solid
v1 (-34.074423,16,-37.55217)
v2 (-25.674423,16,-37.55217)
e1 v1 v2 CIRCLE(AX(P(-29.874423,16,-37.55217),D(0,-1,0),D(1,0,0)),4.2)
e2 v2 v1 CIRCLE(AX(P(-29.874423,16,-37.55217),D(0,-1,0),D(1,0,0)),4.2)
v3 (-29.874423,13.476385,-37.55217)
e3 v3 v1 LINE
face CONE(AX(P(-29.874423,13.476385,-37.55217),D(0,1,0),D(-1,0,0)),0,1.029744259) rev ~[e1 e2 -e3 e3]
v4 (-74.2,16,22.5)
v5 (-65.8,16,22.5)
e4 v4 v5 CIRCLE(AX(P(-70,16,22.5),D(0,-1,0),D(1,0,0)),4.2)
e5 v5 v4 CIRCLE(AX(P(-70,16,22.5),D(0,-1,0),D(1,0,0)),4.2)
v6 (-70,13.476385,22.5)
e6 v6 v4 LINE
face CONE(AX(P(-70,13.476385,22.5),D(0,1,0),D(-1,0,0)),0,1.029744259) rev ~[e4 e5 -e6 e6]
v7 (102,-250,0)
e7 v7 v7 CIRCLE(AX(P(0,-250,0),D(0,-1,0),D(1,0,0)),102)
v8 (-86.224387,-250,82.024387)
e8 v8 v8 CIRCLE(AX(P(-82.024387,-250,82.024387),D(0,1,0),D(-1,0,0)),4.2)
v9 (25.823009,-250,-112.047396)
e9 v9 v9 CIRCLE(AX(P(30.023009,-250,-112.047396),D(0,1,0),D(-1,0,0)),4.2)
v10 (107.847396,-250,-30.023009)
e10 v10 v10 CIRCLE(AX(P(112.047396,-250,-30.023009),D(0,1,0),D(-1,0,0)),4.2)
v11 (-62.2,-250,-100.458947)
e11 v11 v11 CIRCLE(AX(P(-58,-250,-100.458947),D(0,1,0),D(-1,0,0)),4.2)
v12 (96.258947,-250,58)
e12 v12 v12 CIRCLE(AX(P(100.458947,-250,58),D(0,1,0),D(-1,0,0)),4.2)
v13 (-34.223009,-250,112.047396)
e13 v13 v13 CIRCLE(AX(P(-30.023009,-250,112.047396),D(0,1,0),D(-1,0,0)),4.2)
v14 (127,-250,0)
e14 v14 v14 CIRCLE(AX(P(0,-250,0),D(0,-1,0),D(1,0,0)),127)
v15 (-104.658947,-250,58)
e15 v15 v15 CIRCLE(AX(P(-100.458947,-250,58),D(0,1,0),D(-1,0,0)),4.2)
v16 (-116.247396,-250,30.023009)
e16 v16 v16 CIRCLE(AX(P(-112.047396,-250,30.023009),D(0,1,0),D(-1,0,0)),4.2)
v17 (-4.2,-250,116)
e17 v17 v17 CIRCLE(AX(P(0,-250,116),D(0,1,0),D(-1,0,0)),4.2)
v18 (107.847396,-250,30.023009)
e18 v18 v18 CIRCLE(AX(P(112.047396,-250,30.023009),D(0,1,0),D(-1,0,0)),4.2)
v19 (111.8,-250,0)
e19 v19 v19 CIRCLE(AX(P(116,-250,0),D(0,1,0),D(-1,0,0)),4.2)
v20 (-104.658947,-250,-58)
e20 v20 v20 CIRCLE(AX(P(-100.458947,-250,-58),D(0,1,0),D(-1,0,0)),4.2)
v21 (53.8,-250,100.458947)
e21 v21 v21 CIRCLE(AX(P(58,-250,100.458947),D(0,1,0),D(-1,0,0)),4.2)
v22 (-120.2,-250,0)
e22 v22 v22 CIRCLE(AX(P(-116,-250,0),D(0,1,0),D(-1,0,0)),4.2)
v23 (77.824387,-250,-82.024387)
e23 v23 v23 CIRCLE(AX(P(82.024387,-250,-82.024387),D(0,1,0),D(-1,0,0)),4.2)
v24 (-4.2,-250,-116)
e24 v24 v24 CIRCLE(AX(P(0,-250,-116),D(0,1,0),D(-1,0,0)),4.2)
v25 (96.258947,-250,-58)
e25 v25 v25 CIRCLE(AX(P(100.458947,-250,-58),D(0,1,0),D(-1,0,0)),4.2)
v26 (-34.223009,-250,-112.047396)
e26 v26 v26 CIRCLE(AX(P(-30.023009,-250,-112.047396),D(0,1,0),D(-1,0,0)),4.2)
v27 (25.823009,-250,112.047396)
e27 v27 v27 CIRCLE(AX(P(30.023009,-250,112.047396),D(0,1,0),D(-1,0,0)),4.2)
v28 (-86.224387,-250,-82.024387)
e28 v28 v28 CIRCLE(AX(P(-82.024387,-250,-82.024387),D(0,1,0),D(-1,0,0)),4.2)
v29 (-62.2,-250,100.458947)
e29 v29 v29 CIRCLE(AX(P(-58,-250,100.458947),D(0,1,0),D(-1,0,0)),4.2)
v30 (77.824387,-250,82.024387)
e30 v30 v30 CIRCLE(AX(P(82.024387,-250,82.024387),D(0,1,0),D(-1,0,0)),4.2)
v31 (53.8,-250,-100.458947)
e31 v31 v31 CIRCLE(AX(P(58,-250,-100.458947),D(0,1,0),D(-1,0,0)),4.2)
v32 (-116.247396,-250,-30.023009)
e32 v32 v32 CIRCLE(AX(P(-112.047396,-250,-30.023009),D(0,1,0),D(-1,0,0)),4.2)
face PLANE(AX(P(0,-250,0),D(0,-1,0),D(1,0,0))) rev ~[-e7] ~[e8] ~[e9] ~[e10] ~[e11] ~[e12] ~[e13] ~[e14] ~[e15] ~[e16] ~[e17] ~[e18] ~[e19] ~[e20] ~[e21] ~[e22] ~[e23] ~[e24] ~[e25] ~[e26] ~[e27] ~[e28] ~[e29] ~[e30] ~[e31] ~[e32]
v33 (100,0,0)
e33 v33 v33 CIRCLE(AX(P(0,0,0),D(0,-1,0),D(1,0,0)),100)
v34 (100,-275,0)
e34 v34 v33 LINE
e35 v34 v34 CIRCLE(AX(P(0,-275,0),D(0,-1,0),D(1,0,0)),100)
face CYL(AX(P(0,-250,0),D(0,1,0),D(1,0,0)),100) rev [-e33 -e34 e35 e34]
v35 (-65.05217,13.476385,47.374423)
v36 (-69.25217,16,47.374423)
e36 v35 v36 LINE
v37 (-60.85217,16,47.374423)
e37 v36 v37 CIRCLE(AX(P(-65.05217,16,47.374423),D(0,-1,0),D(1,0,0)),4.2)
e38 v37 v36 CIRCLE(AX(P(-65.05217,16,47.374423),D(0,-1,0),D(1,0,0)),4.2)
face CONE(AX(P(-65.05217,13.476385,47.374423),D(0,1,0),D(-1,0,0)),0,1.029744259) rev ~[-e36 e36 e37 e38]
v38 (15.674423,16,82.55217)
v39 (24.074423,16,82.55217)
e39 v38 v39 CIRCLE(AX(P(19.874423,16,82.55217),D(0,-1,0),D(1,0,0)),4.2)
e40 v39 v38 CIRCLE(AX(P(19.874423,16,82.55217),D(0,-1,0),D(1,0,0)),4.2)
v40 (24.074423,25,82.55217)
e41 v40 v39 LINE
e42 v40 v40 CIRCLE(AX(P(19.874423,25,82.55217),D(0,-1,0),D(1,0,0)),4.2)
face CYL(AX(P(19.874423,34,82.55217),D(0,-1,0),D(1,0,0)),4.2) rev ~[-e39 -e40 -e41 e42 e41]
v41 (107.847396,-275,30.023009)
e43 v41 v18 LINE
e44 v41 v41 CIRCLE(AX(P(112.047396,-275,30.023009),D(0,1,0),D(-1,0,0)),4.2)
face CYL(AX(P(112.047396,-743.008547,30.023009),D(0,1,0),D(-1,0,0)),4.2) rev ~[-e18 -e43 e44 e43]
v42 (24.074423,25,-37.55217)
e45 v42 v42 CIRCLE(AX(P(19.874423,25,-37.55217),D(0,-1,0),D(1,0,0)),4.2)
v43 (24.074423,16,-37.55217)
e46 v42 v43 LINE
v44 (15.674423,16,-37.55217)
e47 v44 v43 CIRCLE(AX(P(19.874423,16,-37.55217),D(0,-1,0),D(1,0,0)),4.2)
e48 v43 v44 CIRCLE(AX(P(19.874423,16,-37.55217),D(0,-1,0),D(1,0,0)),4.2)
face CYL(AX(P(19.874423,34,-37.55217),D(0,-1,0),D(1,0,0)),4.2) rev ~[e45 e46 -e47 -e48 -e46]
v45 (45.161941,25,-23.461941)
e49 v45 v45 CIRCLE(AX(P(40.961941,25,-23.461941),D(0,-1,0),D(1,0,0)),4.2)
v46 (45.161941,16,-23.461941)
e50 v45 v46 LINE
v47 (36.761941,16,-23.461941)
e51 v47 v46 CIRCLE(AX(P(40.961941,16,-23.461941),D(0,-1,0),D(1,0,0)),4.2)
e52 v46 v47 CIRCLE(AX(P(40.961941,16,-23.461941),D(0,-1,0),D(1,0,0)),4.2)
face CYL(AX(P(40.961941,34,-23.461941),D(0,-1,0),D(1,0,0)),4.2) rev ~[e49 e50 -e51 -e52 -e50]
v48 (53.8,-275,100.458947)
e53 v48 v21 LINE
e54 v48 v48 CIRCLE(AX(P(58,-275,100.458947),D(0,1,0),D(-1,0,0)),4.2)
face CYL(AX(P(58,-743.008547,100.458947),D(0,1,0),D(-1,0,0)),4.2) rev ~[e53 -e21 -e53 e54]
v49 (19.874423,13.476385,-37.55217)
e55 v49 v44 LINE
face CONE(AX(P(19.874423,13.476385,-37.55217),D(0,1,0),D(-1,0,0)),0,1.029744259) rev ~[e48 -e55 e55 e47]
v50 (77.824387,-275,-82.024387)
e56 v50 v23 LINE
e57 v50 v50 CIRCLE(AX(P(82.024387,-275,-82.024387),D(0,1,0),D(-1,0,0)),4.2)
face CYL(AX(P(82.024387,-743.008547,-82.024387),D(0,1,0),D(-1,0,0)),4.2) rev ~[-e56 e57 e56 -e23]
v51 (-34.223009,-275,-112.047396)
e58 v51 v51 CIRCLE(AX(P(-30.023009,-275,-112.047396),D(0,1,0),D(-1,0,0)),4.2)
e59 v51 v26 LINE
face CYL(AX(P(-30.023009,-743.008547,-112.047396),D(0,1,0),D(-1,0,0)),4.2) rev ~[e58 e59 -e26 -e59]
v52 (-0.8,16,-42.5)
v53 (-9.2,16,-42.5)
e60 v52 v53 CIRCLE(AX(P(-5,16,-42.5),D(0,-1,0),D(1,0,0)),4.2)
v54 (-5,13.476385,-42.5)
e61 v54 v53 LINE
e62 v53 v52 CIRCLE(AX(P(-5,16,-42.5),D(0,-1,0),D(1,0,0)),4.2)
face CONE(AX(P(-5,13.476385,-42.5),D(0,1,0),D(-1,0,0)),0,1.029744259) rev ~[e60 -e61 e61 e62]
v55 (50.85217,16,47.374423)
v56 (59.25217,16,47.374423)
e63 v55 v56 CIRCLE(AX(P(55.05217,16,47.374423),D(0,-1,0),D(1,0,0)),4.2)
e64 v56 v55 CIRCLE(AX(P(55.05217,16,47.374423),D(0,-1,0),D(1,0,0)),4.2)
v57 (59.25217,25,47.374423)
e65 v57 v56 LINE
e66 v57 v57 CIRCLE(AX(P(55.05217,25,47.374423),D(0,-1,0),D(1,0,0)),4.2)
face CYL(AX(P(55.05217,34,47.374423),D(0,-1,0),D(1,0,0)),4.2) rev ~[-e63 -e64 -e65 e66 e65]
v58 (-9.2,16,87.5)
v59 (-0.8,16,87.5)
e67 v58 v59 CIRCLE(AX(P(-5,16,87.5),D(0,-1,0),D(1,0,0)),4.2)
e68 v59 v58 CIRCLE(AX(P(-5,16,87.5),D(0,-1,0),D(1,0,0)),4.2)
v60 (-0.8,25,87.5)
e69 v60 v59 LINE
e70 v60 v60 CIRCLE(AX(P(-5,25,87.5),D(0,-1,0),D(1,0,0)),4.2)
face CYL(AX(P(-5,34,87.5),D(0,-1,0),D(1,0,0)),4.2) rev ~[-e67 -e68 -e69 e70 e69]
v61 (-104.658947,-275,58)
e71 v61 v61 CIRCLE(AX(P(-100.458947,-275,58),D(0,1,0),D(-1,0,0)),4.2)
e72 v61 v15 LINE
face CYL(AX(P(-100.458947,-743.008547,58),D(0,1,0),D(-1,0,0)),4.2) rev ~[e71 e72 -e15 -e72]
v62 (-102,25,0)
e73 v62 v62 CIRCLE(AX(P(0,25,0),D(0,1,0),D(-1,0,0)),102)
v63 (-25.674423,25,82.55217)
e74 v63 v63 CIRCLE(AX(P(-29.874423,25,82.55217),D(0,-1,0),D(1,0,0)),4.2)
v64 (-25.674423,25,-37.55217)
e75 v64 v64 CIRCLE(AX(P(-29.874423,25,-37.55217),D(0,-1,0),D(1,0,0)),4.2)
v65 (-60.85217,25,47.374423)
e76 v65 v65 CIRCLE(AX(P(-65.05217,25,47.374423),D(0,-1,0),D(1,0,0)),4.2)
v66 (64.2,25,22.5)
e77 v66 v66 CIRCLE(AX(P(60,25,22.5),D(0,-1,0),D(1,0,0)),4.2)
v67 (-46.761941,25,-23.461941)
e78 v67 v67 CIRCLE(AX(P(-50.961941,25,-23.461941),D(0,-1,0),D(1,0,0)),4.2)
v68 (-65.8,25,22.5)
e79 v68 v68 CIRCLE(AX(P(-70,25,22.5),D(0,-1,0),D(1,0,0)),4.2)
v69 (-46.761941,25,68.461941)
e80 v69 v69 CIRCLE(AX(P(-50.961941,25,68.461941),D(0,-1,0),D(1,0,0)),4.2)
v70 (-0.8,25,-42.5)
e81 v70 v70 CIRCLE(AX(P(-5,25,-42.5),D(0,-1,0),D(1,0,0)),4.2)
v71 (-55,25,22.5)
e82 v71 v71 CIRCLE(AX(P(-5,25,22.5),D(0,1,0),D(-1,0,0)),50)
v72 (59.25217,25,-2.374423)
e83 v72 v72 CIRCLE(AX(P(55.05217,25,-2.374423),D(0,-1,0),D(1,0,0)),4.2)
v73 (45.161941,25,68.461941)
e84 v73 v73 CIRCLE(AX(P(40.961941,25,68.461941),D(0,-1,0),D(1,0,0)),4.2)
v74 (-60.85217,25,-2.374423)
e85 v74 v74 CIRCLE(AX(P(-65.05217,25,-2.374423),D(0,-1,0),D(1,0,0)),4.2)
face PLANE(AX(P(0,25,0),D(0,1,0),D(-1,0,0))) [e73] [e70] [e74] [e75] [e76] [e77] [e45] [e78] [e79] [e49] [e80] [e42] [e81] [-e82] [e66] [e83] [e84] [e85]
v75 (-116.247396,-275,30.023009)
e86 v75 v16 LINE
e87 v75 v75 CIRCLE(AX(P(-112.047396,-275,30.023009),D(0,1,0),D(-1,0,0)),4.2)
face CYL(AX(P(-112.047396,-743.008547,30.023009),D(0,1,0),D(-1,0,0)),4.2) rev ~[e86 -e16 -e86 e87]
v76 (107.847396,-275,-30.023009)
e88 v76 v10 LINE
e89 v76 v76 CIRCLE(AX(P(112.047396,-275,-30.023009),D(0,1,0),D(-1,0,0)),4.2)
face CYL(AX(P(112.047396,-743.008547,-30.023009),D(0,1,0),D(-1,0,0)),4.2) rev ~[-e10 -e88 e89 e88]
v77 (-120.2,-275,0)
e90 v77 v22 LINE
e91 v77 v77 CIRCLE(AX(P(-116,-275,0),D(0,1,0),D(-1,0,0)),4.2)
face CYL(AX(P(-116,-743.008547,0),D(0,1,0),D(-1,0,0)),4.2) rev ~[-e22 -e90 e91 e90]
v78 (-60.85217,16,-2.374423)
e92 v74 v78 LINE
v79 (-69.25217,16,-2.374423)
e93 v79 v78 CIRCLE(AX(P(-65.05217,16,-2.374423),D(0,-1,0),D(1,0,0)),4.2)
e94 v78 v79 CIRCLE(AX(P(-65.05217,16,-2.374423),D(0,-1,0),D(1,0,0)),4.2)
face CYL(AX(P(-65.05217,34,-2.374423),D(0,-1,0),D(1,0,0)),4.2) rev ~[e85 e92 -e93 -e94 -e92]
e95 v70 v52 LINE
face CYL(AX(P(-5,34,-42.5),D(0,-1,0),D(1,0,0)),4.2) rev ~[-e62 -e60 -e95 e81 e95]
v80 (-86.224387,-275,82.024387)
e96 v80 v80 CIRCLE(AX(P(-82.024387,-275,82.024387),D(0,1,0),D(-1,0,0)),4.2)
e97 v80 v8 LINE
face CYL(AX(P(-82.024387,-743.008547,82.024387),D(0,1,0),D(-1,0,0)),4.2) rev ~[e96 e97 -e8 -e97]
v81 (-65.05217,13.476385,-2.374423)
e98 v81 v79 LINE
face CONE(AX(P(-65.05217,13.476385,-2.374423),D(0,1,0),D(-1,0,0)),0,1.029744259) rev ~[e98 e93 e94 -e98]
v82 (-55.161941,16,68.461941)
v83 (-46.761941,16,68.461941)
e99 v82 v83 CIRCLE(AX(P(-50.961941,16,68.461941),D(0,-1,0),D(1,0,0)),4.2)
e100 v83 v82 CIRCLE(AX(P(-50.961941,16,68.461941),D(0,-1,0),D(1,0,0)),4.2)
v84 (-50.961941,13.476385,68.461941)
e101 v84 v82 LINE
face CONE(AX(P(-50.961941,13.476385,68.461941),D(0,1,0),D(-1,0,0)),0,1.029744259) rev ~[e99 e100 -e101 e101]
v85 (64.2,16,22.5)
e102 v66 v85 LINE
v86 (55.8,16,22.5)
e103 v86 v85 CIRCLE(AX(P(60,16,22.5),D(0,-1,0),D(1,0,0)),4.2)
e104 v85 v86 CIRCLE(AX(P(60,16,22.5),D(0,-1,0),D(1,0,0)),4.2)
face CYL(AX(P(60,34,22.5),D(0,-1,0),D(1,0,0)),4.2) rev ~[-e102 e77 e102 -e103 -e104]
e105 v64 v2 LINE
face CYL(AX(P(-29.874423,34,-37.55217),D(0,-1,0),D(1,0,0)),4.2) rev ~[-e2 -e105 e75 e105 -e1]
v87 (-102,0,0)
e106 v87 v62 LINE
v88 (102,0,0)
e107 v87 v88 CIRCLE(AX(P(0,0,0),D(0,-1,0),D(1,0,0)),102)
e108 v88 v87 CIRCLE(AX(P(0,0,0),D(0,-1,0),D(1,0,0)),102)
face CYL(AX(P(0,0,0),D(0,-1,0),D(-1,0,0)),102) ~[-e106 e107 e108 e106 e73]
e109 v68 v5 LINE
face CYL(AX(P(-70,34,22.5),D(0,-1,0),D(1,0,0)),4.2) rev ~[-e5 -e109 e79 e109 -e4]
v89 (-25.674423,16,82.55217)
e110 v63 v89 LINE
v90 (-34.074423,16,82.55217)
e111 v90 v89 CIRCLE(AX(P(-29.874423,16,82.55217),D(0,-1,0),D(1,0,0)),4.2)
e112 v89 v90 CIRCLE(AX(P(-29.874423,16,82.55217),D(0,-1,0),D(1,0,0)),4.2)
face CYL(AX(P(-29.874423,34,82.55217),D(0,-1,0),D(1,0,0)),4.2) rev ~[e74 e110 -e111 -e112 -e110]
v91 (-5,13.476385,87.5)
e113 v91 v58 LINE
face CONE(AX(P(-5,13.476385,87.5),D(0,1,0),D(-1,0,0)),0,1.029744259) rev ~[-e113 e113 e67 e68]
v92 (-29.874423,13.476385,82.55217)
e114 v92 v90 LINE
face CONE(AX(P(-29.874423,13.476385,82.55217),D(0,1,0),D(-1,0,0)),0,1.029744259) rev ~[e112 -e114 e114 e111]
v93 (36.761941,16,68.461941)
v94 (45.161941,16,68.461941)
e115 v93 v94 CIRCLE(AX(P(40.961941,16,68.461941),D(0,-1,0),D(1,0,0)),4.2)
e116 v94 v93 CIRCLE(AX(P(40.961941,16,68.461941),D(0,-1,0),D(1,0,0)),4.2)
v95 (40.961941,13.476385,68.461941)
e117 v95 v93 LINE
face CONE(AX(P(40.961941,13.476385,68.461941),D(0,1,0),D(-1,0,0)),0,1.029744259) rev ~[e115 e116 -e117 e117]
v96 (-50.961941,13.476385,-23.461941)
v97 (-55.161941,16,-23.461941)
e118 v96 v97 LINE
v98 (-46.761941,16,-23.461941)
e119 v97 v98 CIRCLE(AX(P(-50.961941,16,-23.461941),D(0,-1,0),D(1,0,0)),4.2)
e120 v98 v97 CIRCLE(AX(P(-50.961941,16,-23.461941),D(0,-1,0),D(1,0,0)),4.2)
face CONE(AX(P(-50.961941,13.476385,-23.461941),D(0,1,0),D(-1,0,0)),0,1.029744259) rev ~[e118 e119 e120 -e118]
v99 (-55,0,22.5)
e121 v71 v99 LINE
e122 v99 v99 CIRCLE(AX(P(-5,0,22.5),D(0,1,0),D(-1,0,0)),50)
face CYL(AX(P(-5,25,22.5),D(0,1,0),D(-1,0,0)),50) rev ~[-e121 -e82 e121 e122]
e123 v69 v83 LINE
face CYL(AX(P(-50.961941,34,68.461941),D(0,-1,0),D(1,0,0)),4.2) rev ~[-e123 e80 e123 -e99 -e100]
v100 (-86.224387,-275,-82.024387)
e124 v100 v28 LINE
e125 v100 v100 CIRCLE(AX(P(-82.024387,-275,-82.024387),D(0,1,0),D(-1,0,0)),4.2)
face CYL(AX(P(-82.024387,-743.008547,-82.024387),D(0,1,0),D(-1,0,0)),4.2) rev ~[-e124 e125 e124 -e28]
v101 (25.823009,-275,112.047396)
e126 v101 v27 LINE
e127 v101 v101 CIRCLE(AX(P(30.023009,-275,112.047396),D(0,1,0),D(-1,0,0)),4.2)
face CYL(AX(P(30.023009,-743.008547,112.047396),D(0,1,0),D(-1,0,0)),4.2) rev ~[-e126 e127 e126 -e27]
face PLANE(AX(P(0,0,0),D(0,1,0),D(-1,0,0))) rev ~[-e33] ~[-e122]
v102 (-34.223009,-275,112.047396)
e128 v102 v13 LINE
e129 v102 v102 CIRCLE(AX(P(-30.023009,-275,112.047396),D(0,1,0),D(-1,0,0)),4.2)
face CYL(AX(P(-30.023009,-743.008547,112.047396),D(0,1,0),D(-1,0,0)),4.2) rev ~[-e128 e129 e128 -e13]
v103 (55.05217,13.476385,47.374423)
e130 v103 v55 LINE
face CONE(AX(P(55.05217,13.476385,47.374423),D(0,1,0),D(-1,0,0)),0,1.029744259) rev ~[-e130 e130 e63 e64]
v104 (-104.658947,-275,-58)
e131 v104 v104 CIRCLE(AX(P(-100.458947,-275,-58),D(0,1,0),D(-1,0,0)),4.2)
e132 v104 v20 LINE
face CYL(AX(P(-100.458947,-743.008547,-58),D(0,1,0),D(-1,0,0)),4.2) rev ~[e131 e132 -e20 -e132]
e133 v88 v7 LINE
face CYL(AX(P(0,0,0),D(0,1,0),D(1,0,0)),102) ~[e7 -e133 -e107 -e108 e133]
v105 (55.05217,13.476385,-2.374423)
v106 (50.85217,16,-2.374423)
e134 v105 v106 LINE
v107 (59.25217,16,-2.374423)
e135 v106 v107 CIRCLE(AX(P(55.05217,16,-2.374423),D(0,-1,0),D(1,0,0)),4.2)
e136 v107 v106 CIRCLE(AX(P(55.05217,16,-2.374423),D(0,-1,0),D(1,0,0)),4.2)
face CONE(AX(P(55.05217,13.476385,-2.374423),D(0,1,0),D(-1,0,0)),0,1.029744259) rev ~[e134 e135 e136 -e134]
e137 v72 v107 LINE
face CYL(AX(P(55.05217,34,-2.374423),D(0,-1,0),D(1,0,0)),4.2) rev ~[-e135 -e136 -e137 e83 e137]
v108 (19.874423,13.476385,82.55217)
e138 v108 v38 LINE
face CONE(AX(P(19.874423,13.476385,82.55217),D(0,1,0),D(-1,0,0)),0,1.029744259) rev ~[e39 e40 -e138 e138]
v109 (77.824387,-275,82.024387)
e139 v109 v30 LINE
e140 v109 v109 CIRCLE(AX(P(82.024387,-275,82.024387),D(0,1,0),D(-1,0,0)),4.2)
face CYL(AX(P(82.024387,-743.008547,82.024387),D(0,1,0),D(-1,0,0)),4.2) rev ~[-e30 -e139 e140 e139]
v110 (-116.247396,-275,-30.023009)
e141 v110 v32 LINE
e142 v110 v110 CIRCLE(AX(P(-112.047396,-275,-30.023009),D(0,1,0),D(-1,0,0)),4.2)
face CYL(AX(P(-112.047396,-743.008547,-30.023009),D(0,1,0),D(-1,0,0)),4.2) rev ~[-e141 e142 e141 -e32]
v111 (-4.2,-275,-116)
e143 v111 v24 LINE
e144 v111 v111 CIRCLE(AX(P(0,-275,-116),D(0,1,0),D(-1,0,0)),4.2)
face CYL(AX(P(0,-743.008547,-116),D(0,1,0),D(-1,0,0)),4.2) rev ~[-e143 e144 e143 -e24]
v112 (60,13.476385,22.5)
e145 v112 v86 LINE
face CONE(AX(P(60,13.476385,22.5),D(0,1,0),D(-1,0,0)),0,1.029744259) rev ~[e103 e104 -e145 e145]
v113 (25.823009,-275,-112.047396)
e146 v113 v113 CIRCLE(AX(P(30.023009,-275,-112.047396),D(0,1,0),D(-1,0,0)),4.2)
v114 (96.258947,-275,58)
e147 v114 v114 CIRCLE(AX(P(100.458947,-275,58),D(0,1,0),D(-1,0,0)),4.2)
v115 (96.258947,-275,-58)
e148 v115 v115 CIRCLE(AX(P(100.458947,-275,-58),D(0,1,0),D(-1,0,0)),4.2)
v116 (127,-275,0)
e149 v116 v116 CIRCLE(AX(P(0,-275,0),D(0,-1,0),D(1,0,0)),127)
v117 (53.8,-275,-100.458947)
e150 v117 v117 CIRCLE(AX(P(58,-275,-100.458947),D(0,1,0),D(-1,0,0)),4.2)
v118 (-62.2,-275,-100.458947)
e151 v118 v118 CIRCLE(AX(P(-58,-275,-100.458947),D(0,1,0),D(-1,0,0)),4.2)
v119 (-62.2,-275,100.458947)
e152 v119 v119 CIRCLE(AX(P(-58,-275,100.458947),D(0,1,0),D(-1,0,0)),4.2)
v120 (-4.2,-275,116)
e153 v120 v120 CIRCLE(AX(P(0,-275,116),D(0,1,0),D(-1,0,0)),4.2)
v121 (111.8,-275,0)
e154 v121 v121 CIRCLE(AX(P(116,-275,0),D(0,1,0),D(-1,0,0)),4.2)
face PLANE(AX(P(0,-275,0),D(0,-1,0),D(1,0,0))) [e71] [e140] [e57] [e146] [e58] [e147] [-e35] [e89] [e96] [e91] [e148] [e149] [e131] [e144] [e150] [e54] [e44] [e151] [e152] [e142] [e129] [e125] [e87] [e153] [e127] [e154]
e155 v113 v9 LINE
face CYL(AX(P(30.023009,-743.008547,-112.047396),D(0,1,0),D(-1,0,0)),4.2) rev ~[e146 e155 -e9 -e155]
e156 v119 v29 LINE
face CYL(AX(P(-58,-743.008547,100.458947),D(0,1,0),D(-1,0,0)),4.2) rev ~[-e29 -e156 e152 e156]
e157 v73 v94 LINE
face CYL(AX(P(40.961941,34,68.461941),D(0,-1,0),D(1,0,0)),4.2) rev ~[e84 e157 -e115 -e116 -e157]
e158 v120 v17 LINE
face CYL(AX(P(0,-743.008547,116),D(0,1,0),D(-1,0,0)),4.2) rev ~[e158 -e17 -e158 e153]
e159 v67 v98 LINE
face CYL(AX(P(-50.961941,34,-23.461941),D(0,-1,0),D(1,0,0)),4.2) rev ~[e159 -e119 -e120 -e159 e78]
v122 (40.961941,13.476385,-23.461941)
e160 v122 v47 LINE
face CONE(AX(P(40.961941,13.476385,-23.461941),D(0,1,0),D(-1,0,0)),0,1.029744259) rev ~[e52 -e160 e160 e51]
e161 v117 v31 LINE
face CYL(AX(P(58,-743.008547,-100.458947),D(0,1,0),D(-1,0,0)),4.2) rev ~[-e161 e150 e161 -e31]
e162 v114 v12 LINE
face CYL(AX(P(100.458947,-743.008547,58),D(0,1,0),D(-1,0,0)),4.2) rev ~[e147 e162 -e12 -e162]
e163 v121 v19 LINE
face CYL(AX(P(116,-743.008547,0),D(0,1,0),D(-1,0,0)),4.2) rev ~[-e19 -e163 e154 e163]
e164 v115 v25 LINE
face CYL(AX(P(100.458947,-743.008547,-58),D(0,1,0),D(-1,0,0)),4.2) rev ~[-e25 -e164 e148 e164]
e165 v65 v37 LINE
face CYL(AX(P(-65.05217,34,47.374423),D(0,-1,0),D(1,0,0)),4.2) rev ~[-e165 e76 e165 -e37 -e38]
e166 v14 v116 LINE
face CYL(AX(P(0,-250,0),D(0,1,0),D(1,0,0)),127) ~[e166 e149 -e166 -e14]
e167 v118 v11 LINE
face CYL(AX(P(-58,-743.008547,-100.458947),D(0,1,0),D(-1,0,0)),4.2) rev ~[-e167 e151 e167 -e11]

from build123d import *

# Parameters (mm, degrees)
F0_R      = 102
F0_R_2    = 100
F1_DEPTH  = 250
F2_R      = 127
F2_R_2    = 102
F2_R_3    = 100
F3_DEPTH  = 25
F4_R      = 102
F4_R_2    = 100
F5_DEPTH  = 25
F7_D      = 8.4
F8_R      = 50
F9_DEPTH  = 300.001
F10_D     = 8.4
F10_DEPTH = 9
F10_TIP   = 2.5236145999


with BuildPart() as f1:
    # F0 (on Front) → F1 (new body)
    with BuildSketch(Plane.XZ):
        Circle(F0_R)
        Circle(F0_R_2, mode=Mode.SUBTRACT)
    extrude(amount=F1_DEPTH)

    # F2 (on face) → F3 (join)
    with BuildSketch(Plane.XZ.offset(250)):
        Circle(F2_R)
        Circle(F2_R_2, mode=Mode.SUBTRACT)
        Circle(F2_R_2)
        Circle(F2_R_3, mode=Mode.SUBTRACT)
    extrude(amount=F3_DEPTH)

    # F4 (on face) → F5 (join)
    with BuildSketch(Plane(origin=(0, 0, 0), x_dir=(-1, 0, 0), z_dir=(0, 1, 0))):
        Circle(F4_R)
        Circle(F4_R_2, mode=Mode.SUBTRACT)
        Circle(F4_R_2)
    extrude(amount=F5_DEPTH)

    # F7 (through all)
    with Locations(Plane.XZ.offset(275)):
        with Locations((0, 116), (30.0230092319, 112.0473958495), (58, 100.458946839), (82.0243866176, 82.0243866176), (100.458946839, 58), (112.0473958495, 30.0230092319), (116, 0), (112.0473958495, -30.0230092319), (100.458946839, -58), (82.0243866176, -82.0243866176), (58, -100.458946839), (30.0230092319, -112.0473958495), (0, -116), (-30.0230092319, -112.0473958495), (-58, -100.458946839), (-82.0243866176, -82.0243866176), (-100.458946839, -58), (-112.0473958495, -30.0230092319), (-116, 0), (-112.0473958495, 30.0230092319), (-100.458946839, 58), (-82.0243866176, 82.0243866176), (-58, 100.458946839), (-30.0230092319, 112.0473958495)):
            Hole(F7_D / 2)

    # F8 (on face) → F9 (cut, through all)
    with BuildSketch(Plane(origin=(0, 25, 0), x_dir=(-1, 0, 0), z_dir=(0, 1, 0))):
        with Locations((5, 22.5)):
            Circle(F8_R)
    extrude(amount=-F9_DEPTH, mode=Mode.SUBTRACT)

    # F10
    with Locations(Plane(origin=(0, 25, 0), x_dir=(-1, 0, 0), z_dir=(0, 1, 0))):
        with Locations((5, 87.5), (-19.8744231037, -37.5521696132), (-40.9619407771, -23.4619407771), (-55.0521696132, -2.3744231037), (-60, 22.5), (-55.0521696132, 47.3744231037), (-40.9619407771, 68.4619407771), (-19.8744231037, 82.5521696132), (29.8744231037, 82.5521696132), (50.9619407771, 68.4619407771), (65.0521696132, 47.3744231037), (70, 22.5), (65.0521696132, -2.3744231037), (50.9619407771, -23.4619407771), (29.8744231037, -37.5521696132), (5, -42.5)):
            Hole(F10_D / 2, depth=F10_DEPTH)
            with Locations((0, 0, -(F10_DEPTH + F10_TIP / 2))):  # 118° drill point
                Cone(0, F10_D / 2, F10_TIP, mode=Mode.SUBTRACT)


solid = f1.part
